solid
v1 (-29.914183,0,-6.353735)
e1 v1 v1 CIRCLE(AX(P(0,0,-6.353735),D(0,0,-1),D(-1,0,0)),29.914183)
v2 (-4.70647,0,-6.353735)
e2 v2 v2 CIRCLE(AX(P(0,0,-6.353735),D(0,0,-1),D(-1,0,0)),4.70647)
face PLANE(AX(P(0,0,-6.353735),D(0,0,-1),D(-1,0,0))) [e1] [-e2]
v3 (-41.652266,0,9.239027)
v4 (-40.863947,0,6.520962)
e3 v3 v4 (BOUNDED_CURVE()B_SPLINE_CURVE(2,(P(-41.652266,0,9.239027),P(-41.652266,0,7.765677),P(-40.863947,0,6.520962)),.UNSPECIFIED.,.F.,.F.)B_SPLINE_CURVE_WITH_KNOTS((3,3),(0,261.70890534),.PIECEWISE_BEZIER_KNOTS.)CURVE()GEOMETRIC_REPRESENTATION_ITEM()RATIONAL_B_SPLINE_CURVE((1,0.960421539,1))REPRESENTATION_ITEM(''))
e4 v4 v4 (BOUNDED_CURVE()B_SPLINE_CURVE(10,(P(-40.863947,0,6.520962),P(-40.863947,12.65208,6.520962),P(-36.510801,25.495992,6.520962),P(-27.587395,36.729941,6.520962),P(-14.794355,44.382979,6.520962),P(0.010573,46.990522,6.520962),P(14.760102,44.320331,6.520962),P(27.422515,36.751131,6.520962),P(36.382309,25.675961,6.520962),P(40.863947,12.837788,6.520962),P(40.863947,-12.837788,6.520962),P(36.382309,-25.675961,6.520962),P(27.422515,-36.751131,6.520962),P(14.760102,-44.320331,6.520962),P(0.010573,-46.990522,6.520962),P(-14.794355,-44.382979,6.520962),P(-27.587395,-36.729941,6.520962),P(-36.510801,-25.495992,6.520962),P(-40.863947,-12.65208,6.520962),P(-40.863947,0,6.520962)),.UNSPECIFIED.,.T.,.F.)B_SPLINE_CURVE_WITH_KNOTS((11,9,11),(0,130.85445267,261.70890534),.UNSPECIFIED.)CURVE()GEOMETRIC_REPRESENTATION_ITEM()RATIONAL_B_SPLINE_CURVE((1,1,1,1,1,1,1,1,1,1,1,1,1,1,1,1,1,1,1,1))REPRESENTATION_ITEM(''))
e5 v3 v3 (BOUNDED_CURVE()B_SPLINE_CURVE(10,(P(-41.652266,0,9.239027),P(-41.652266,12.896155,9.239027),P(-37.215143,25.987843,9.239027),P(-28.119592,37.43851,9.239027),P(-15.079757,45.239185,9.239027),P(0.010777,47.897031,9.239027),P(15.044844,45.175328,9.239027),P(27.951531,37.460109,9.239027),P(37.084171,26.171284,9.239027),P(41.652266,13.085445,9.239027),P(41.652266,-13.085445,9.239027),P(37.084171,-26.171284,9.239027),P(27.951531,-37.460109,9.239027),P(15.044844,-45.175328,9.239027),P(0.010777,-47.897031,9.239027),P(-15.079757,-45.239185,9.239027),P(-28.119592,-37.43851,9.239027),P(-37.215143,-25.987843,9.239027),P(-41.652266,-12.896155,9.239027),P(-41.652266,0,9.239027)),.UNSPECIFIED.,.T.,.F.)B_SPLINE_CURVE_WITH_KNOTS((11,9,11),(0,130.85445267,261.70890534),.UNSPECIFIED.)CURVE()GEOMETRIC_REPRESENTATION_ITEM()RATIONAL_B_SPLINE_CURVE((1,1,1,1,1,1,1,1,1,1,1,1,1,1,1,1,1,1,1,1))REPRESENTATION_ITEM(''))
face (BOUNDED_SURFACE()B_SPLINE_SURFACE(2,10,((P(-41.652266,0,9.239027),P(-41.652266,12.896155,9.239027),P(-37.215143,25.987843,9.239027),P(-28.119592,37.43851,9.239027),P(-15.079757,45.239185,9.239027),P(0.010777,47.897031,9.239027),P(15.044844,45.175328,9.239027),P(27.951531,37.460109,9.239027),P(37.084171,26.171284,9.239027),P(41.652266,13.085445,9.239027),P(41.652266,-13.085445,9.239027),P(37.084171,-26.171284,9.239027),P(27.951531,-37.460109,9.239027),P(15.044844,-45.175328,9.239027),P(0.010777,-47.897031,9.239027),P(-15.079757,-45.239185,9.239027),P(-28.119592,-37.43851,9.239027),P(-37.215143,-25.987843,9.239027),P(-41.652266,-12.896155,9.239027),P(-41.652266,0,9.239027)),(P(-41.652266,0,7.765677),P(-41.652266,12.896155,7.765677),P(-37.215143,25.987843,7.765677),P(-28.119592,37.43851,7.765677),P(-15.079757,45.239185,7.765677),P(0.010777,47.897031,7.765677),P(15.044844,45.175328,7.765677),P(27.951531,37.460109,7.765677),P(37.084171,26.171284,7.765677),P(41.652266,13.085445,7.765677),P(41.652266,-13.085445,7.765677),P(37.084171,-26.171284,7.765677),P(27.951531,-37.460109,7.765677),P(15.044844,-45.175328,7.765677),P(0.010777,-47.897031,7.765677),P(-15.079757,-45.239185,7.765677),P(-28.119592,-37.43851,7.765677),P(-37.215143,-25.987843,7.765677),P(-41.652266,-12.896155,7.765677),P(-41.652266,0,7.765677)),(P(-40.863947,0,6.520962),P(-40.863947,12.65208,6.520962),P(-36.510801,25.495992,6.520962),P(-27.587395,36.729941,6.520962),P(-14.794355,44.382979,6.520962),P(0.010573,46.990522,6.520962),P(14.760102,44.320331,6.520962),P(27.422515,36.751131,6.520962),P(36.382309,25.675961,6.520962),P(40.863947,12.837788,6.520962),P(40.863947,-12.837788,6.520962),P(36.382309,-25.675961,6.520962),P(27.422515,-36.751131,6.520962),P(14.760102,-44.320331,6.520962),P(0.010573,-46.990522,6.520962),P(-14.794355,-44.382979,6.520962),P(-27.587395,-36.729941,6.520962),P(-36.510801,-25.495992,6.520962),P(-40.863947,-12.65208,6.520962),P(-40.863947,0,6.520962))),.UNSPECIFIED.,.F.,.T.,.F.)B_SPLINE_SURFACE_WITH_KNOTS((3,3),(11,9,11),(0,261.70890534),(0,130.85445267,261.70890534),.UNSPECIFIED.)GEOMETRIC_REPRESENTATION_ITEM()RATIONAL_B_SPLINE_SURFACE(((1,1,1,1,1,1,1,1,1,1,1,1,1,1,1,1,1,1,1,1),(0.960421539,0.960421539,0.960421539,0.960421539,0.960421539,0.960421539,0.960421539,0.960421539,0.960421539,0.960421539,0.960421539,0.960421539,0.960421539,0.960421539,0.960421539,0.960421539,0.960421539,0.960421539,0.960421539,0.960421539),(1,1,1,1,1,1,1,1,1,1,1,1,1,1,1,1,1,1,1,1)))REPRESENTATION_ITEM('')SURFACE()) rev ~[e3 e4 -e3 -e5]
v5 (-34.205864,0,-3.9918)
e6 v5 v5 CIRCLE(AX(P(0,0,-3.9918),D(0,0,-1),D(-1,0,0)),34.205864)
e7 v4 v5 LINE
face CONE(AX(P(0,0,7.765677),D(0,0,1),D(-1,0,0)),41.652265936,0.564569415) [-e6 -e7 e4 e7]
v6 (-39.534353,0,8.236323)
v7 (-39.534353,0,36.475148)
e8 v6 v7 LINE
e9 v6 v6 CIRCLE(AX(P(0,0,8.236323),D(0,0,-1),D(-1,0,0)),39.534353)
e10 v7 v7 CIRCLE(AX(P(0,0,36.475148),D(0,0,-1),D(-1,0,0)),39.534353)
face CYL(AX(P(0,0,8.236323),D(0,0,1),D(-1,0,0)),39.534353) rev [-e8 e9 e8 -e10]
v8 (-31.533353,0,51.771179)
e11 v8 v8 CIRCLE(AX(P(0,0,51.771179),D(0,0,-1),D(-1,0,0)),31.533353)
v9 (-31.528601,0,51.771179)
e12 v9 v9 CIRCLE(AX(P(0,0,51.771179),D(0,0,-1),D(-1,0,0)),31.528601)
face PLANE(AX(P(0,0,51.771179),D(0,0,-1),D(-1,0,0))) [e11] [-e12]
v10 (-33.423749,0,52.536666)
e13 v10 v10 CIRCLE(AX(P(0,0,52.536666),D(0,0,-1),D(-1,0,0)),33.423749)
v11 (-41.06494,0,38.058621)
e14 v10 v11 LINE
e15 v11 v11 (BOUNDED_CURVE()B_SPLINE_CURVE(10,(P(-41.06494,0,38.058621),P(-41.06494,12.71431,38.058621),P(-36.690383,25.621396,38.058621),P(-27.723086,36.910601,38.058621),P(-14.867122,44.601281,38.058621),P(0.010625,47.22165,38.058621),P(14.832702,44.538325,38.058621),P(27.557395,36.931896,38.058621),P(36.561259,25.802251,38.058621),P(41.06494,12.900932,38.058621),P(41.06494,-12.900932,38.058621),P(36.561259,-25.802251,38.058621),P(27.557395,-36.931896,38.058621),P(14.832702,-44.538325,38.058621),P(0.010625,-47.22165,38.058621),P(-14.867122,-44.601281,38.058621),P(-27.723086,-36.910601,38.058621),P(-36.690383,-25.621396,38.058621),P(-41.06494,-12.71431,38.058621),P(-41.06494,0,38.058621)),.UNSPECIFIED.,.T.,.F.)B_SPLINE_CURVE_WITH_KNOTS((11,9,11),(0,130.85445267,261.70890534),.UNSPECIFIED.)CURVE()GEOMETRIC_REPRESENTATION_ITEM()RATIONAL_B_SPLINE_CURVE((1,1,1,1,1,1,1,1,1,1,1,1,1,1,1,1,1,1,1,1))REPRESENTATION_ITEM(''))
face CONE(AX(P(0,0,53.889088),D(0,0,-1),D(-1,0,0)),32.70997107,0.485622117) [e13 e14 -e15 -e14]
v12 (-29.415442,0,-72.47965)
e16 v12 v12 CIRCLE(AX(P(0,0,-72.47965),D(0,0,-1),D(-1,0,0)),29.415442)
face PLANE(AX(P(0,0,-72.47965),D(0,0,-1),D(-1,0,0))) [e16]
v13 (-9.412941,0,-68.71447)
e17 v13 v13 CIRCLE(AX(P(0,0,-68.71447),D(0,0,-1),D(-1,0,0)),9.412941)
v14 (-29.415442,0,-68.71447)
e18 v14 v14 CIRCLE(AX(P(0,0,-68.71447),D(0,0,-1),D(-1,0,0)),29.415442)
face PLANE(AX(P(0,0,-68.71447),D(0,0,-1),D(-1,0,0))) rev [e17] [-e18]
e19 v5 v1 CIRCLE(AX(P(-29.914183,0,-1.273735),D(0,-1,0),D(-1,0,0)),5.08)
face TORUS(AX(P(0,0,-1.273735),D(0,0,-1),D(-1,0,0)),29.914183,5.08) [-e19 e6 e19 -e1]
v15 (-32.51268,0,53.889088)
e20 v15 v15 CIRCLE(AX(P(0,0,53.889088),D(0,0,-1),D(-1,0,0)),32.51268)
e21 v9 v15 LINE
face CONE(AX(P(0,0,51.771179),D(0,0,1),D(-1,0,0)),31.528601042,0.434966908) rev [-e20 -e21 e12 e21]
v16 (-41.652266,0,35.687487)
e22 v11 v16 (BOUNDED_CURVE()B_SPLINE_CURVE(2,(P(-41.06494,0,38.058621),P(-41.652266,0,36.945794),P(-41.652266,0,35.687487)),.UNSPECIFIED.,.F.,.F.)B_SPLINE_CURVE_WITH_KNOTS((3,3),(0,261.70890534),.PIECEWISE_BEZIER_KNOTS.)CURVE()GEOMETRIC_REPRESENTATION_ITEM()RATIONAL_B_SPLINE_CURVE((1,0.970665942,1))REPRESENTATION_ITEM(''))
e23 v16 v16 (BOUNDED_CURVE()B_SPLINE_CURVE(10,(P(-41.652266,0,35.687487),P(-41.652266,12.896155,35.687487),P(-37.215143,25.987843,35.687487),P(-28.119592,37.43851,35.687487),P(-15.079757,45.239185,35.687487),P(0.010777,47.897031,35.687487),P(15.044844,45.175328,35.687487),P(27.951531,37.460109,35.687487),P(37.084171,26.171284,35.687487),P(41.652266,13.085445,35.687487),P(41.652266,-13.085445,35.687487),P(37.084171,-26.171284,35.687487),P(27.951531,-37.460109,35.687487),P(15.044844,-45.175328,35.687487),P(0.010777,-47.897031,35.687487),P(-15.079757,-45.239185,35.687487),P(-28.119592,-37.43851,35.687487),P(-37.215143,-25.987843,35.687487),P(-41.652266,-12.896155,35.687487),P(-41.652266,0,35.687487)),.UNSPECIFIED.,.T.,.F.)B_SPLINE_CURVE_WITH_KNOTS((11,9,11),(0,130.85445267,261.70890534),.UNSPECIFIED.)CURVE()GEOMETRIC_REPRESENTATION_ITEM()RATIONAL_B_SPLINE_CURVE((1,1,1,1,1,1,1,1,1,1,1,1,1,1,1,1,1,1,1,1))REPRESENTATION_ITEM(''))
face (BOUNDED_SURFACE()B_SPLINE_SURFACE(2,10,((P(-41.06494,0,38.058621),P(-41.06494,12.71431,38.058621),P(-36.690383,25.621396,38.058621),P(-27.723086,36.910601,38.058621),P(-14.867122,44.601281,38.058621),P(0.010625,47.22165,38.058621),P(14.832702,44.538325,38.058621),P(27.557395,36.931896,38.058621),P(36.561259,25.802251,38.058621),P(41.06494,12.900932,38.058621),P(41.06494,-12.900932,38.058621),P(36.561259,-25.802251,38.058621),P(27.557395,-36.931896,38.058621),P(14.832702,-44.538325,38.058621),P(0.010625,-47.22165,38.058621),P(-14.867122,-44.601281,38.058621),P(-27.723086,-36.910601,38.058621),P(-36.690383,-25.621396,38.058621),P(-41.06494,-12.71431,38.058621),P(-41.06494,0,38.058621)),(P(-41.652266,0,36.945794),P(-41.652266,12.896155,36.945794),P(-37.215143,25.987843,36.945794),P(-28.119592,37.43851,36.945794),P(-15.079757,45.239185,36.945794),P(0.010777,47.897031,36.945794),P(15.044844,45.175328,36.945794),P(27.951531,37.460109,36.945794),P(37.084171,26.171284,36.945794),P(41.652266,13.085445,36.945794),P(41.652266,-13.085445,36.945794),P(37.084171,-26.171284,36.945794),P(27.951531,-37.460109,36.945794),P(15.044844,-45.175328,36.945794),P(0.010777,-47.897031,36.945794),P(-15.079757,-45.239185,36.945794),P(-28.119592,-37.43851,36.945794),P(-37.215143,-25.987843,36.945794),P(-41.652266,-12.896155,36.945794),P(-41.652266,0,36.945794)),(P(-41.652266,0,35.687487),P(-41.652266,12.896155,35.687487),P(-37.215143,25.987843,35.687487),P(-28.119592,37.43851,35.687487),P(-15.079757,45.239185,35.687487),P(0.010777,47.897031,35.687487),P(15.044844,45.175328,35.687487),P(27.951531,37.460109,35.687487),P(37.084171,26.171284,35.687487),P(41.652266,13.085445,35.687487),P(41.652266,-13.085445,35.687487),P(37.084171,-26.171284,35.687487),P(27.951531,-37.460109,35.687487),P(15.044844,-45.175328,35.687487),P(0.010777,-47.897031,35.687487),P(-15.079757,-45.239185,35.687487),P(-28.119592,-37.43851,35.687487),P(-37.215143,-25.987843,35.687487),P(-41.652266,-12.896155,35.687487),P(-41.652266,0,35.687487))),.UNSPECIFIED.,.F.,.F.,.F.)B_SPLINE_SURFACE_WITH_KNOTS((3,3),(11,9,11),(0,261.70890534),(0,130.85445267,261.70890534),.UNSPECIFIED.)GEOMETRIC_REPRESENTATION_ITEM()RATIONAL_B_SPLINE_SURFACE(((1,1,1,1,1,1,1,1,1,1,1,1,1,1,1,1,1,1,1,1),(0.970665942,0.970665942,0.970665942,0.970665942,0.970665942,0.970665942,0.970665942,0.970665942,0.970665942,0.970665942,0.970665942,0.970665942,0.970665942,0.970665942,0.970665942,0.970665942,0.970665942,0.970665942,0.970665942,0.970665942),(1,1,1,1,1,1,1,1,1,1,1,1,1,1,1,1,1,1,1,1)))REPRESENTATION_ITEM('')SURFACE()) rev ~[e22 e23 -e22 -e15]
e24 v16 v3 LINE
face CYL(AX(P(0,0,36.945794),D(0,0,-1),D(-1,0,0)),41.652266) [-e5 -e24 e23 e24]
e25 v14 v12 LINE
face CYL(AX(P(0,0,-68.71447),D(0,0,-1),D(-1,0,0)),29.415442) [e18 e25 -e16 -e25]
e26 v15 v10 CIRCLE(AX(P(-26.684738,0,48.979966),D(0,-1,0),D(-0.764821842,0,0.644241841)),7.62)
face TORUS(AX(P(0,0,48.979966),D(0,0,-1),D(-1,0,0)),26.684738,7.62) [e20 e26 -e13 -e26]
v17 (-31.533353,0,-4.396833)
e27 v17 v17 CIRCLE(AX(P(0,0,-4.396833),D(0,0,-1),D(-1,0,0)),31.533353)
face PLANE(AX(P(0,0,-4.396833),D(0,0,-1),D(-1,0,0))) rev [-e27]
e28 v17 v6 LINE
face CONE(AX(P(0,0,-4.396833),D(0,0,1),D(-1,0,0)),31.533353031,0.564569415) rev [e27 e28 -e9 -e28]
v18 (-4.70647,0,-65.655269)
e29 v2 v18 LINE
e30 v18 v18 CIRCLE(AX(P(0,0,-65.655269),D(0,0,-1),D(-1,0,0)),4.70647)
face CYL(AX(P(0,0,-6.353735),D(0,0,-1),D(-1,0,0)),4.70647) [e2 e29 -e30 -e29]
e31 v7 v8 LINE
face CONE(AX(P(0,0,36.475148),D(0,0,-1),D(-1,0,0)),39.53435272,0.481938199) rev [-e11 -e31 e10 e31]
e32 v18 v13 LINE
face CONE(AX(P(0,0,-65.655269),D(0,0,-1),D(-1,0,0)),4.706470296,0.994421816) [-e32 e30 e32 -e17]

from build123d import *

# Parameters (mm, degrees)
F3_R = 5.08
F4_R = 5.08
F5_R = 5.08


# Not quite as in the source:
# - a fillet or chamfer that OpenCascade refuses, or shapes differently, is made with other operations: its cross-section is extruded or revolved along the edge and cut away or added


with BuildPart() as f1:
    # F0 (on Front) → F1 (revolve)
    with BuildSketch(Plane.XZ):
        Polygon((-31.5286010422, 51.7711788416), (-32.5126800885, 53.8890883327), (-32.7099710703, 53.8890883327), (-41.6522659361, 36.9457937777), (-41.6522659361, 7.7656768262), (-32.7099710703, -6.3537354581), (-12.7074699849, -6.3537354581), (-4.7064702958, -6.3537354581), (-4.7064702958, -65.6552687287), (-9.4129405916, -68.7144696712), (-29.415441677, -68.7144696712), (-29.415441677, -72.4796503782), (0, -72.4796503782), (0, -4.3968333285), (-12.472147122, -4.3968333285), (-31.5333530307, -4.3968333285), (-39.5343527198, 8.2363234833), (-39.5343527198, 36.475148052), (-31.5333530307, 51.7711788416), align=None)
    revolve(axis=Axis((0, 0, -0.3529824317), (0, 0, -1)))

    # F2: fillet of radius 7.62 on 1 edges, made by hand

    # F2_s1 → F2_t2 (revolve, cut)
    with BuildSketch(Plane.XZ):
        with BuildLine():
            ThreePointArc((-32.5126800885, 53.8890883327), (-33.0044959985, 53.2373184877), (-33.4237493814, 52.5366663478))
            Line((-33.4237493814, 52.5366663478), (-32.7099710703, 53.8890883327))
            Line((-32.7099710703, 53.8890883327), (-32.5126800885, 53.8890883327))
        make_face()
    revolve(axis=Axis((0, 0, 53.8890883327), (0, 0, -1)), mode=Mode.SUBTRACT)

    # F3
    f3_edges = [f1.edges().sort_by_distance(p)[0] for p in [
        (41.652266, 0, 36.945794),
    ]]
    fillet(f3_edges, radius=F3_R)

    # F4
    f4_edges = [f1.edges().sort_by_distance(p)[0] for p in [
        (41.652266, 0, 7.765677),
    ]]
    fillet(f4_edges, radius=F4_R)

    # F5
    f5_edges = [f1.edges().sort_by_distance(p)[0] for p in [
        (32.709971, 0, -6.353735),
    ]]
    fillet(f5_edges, radius=F5_R)


solid = f1.part
